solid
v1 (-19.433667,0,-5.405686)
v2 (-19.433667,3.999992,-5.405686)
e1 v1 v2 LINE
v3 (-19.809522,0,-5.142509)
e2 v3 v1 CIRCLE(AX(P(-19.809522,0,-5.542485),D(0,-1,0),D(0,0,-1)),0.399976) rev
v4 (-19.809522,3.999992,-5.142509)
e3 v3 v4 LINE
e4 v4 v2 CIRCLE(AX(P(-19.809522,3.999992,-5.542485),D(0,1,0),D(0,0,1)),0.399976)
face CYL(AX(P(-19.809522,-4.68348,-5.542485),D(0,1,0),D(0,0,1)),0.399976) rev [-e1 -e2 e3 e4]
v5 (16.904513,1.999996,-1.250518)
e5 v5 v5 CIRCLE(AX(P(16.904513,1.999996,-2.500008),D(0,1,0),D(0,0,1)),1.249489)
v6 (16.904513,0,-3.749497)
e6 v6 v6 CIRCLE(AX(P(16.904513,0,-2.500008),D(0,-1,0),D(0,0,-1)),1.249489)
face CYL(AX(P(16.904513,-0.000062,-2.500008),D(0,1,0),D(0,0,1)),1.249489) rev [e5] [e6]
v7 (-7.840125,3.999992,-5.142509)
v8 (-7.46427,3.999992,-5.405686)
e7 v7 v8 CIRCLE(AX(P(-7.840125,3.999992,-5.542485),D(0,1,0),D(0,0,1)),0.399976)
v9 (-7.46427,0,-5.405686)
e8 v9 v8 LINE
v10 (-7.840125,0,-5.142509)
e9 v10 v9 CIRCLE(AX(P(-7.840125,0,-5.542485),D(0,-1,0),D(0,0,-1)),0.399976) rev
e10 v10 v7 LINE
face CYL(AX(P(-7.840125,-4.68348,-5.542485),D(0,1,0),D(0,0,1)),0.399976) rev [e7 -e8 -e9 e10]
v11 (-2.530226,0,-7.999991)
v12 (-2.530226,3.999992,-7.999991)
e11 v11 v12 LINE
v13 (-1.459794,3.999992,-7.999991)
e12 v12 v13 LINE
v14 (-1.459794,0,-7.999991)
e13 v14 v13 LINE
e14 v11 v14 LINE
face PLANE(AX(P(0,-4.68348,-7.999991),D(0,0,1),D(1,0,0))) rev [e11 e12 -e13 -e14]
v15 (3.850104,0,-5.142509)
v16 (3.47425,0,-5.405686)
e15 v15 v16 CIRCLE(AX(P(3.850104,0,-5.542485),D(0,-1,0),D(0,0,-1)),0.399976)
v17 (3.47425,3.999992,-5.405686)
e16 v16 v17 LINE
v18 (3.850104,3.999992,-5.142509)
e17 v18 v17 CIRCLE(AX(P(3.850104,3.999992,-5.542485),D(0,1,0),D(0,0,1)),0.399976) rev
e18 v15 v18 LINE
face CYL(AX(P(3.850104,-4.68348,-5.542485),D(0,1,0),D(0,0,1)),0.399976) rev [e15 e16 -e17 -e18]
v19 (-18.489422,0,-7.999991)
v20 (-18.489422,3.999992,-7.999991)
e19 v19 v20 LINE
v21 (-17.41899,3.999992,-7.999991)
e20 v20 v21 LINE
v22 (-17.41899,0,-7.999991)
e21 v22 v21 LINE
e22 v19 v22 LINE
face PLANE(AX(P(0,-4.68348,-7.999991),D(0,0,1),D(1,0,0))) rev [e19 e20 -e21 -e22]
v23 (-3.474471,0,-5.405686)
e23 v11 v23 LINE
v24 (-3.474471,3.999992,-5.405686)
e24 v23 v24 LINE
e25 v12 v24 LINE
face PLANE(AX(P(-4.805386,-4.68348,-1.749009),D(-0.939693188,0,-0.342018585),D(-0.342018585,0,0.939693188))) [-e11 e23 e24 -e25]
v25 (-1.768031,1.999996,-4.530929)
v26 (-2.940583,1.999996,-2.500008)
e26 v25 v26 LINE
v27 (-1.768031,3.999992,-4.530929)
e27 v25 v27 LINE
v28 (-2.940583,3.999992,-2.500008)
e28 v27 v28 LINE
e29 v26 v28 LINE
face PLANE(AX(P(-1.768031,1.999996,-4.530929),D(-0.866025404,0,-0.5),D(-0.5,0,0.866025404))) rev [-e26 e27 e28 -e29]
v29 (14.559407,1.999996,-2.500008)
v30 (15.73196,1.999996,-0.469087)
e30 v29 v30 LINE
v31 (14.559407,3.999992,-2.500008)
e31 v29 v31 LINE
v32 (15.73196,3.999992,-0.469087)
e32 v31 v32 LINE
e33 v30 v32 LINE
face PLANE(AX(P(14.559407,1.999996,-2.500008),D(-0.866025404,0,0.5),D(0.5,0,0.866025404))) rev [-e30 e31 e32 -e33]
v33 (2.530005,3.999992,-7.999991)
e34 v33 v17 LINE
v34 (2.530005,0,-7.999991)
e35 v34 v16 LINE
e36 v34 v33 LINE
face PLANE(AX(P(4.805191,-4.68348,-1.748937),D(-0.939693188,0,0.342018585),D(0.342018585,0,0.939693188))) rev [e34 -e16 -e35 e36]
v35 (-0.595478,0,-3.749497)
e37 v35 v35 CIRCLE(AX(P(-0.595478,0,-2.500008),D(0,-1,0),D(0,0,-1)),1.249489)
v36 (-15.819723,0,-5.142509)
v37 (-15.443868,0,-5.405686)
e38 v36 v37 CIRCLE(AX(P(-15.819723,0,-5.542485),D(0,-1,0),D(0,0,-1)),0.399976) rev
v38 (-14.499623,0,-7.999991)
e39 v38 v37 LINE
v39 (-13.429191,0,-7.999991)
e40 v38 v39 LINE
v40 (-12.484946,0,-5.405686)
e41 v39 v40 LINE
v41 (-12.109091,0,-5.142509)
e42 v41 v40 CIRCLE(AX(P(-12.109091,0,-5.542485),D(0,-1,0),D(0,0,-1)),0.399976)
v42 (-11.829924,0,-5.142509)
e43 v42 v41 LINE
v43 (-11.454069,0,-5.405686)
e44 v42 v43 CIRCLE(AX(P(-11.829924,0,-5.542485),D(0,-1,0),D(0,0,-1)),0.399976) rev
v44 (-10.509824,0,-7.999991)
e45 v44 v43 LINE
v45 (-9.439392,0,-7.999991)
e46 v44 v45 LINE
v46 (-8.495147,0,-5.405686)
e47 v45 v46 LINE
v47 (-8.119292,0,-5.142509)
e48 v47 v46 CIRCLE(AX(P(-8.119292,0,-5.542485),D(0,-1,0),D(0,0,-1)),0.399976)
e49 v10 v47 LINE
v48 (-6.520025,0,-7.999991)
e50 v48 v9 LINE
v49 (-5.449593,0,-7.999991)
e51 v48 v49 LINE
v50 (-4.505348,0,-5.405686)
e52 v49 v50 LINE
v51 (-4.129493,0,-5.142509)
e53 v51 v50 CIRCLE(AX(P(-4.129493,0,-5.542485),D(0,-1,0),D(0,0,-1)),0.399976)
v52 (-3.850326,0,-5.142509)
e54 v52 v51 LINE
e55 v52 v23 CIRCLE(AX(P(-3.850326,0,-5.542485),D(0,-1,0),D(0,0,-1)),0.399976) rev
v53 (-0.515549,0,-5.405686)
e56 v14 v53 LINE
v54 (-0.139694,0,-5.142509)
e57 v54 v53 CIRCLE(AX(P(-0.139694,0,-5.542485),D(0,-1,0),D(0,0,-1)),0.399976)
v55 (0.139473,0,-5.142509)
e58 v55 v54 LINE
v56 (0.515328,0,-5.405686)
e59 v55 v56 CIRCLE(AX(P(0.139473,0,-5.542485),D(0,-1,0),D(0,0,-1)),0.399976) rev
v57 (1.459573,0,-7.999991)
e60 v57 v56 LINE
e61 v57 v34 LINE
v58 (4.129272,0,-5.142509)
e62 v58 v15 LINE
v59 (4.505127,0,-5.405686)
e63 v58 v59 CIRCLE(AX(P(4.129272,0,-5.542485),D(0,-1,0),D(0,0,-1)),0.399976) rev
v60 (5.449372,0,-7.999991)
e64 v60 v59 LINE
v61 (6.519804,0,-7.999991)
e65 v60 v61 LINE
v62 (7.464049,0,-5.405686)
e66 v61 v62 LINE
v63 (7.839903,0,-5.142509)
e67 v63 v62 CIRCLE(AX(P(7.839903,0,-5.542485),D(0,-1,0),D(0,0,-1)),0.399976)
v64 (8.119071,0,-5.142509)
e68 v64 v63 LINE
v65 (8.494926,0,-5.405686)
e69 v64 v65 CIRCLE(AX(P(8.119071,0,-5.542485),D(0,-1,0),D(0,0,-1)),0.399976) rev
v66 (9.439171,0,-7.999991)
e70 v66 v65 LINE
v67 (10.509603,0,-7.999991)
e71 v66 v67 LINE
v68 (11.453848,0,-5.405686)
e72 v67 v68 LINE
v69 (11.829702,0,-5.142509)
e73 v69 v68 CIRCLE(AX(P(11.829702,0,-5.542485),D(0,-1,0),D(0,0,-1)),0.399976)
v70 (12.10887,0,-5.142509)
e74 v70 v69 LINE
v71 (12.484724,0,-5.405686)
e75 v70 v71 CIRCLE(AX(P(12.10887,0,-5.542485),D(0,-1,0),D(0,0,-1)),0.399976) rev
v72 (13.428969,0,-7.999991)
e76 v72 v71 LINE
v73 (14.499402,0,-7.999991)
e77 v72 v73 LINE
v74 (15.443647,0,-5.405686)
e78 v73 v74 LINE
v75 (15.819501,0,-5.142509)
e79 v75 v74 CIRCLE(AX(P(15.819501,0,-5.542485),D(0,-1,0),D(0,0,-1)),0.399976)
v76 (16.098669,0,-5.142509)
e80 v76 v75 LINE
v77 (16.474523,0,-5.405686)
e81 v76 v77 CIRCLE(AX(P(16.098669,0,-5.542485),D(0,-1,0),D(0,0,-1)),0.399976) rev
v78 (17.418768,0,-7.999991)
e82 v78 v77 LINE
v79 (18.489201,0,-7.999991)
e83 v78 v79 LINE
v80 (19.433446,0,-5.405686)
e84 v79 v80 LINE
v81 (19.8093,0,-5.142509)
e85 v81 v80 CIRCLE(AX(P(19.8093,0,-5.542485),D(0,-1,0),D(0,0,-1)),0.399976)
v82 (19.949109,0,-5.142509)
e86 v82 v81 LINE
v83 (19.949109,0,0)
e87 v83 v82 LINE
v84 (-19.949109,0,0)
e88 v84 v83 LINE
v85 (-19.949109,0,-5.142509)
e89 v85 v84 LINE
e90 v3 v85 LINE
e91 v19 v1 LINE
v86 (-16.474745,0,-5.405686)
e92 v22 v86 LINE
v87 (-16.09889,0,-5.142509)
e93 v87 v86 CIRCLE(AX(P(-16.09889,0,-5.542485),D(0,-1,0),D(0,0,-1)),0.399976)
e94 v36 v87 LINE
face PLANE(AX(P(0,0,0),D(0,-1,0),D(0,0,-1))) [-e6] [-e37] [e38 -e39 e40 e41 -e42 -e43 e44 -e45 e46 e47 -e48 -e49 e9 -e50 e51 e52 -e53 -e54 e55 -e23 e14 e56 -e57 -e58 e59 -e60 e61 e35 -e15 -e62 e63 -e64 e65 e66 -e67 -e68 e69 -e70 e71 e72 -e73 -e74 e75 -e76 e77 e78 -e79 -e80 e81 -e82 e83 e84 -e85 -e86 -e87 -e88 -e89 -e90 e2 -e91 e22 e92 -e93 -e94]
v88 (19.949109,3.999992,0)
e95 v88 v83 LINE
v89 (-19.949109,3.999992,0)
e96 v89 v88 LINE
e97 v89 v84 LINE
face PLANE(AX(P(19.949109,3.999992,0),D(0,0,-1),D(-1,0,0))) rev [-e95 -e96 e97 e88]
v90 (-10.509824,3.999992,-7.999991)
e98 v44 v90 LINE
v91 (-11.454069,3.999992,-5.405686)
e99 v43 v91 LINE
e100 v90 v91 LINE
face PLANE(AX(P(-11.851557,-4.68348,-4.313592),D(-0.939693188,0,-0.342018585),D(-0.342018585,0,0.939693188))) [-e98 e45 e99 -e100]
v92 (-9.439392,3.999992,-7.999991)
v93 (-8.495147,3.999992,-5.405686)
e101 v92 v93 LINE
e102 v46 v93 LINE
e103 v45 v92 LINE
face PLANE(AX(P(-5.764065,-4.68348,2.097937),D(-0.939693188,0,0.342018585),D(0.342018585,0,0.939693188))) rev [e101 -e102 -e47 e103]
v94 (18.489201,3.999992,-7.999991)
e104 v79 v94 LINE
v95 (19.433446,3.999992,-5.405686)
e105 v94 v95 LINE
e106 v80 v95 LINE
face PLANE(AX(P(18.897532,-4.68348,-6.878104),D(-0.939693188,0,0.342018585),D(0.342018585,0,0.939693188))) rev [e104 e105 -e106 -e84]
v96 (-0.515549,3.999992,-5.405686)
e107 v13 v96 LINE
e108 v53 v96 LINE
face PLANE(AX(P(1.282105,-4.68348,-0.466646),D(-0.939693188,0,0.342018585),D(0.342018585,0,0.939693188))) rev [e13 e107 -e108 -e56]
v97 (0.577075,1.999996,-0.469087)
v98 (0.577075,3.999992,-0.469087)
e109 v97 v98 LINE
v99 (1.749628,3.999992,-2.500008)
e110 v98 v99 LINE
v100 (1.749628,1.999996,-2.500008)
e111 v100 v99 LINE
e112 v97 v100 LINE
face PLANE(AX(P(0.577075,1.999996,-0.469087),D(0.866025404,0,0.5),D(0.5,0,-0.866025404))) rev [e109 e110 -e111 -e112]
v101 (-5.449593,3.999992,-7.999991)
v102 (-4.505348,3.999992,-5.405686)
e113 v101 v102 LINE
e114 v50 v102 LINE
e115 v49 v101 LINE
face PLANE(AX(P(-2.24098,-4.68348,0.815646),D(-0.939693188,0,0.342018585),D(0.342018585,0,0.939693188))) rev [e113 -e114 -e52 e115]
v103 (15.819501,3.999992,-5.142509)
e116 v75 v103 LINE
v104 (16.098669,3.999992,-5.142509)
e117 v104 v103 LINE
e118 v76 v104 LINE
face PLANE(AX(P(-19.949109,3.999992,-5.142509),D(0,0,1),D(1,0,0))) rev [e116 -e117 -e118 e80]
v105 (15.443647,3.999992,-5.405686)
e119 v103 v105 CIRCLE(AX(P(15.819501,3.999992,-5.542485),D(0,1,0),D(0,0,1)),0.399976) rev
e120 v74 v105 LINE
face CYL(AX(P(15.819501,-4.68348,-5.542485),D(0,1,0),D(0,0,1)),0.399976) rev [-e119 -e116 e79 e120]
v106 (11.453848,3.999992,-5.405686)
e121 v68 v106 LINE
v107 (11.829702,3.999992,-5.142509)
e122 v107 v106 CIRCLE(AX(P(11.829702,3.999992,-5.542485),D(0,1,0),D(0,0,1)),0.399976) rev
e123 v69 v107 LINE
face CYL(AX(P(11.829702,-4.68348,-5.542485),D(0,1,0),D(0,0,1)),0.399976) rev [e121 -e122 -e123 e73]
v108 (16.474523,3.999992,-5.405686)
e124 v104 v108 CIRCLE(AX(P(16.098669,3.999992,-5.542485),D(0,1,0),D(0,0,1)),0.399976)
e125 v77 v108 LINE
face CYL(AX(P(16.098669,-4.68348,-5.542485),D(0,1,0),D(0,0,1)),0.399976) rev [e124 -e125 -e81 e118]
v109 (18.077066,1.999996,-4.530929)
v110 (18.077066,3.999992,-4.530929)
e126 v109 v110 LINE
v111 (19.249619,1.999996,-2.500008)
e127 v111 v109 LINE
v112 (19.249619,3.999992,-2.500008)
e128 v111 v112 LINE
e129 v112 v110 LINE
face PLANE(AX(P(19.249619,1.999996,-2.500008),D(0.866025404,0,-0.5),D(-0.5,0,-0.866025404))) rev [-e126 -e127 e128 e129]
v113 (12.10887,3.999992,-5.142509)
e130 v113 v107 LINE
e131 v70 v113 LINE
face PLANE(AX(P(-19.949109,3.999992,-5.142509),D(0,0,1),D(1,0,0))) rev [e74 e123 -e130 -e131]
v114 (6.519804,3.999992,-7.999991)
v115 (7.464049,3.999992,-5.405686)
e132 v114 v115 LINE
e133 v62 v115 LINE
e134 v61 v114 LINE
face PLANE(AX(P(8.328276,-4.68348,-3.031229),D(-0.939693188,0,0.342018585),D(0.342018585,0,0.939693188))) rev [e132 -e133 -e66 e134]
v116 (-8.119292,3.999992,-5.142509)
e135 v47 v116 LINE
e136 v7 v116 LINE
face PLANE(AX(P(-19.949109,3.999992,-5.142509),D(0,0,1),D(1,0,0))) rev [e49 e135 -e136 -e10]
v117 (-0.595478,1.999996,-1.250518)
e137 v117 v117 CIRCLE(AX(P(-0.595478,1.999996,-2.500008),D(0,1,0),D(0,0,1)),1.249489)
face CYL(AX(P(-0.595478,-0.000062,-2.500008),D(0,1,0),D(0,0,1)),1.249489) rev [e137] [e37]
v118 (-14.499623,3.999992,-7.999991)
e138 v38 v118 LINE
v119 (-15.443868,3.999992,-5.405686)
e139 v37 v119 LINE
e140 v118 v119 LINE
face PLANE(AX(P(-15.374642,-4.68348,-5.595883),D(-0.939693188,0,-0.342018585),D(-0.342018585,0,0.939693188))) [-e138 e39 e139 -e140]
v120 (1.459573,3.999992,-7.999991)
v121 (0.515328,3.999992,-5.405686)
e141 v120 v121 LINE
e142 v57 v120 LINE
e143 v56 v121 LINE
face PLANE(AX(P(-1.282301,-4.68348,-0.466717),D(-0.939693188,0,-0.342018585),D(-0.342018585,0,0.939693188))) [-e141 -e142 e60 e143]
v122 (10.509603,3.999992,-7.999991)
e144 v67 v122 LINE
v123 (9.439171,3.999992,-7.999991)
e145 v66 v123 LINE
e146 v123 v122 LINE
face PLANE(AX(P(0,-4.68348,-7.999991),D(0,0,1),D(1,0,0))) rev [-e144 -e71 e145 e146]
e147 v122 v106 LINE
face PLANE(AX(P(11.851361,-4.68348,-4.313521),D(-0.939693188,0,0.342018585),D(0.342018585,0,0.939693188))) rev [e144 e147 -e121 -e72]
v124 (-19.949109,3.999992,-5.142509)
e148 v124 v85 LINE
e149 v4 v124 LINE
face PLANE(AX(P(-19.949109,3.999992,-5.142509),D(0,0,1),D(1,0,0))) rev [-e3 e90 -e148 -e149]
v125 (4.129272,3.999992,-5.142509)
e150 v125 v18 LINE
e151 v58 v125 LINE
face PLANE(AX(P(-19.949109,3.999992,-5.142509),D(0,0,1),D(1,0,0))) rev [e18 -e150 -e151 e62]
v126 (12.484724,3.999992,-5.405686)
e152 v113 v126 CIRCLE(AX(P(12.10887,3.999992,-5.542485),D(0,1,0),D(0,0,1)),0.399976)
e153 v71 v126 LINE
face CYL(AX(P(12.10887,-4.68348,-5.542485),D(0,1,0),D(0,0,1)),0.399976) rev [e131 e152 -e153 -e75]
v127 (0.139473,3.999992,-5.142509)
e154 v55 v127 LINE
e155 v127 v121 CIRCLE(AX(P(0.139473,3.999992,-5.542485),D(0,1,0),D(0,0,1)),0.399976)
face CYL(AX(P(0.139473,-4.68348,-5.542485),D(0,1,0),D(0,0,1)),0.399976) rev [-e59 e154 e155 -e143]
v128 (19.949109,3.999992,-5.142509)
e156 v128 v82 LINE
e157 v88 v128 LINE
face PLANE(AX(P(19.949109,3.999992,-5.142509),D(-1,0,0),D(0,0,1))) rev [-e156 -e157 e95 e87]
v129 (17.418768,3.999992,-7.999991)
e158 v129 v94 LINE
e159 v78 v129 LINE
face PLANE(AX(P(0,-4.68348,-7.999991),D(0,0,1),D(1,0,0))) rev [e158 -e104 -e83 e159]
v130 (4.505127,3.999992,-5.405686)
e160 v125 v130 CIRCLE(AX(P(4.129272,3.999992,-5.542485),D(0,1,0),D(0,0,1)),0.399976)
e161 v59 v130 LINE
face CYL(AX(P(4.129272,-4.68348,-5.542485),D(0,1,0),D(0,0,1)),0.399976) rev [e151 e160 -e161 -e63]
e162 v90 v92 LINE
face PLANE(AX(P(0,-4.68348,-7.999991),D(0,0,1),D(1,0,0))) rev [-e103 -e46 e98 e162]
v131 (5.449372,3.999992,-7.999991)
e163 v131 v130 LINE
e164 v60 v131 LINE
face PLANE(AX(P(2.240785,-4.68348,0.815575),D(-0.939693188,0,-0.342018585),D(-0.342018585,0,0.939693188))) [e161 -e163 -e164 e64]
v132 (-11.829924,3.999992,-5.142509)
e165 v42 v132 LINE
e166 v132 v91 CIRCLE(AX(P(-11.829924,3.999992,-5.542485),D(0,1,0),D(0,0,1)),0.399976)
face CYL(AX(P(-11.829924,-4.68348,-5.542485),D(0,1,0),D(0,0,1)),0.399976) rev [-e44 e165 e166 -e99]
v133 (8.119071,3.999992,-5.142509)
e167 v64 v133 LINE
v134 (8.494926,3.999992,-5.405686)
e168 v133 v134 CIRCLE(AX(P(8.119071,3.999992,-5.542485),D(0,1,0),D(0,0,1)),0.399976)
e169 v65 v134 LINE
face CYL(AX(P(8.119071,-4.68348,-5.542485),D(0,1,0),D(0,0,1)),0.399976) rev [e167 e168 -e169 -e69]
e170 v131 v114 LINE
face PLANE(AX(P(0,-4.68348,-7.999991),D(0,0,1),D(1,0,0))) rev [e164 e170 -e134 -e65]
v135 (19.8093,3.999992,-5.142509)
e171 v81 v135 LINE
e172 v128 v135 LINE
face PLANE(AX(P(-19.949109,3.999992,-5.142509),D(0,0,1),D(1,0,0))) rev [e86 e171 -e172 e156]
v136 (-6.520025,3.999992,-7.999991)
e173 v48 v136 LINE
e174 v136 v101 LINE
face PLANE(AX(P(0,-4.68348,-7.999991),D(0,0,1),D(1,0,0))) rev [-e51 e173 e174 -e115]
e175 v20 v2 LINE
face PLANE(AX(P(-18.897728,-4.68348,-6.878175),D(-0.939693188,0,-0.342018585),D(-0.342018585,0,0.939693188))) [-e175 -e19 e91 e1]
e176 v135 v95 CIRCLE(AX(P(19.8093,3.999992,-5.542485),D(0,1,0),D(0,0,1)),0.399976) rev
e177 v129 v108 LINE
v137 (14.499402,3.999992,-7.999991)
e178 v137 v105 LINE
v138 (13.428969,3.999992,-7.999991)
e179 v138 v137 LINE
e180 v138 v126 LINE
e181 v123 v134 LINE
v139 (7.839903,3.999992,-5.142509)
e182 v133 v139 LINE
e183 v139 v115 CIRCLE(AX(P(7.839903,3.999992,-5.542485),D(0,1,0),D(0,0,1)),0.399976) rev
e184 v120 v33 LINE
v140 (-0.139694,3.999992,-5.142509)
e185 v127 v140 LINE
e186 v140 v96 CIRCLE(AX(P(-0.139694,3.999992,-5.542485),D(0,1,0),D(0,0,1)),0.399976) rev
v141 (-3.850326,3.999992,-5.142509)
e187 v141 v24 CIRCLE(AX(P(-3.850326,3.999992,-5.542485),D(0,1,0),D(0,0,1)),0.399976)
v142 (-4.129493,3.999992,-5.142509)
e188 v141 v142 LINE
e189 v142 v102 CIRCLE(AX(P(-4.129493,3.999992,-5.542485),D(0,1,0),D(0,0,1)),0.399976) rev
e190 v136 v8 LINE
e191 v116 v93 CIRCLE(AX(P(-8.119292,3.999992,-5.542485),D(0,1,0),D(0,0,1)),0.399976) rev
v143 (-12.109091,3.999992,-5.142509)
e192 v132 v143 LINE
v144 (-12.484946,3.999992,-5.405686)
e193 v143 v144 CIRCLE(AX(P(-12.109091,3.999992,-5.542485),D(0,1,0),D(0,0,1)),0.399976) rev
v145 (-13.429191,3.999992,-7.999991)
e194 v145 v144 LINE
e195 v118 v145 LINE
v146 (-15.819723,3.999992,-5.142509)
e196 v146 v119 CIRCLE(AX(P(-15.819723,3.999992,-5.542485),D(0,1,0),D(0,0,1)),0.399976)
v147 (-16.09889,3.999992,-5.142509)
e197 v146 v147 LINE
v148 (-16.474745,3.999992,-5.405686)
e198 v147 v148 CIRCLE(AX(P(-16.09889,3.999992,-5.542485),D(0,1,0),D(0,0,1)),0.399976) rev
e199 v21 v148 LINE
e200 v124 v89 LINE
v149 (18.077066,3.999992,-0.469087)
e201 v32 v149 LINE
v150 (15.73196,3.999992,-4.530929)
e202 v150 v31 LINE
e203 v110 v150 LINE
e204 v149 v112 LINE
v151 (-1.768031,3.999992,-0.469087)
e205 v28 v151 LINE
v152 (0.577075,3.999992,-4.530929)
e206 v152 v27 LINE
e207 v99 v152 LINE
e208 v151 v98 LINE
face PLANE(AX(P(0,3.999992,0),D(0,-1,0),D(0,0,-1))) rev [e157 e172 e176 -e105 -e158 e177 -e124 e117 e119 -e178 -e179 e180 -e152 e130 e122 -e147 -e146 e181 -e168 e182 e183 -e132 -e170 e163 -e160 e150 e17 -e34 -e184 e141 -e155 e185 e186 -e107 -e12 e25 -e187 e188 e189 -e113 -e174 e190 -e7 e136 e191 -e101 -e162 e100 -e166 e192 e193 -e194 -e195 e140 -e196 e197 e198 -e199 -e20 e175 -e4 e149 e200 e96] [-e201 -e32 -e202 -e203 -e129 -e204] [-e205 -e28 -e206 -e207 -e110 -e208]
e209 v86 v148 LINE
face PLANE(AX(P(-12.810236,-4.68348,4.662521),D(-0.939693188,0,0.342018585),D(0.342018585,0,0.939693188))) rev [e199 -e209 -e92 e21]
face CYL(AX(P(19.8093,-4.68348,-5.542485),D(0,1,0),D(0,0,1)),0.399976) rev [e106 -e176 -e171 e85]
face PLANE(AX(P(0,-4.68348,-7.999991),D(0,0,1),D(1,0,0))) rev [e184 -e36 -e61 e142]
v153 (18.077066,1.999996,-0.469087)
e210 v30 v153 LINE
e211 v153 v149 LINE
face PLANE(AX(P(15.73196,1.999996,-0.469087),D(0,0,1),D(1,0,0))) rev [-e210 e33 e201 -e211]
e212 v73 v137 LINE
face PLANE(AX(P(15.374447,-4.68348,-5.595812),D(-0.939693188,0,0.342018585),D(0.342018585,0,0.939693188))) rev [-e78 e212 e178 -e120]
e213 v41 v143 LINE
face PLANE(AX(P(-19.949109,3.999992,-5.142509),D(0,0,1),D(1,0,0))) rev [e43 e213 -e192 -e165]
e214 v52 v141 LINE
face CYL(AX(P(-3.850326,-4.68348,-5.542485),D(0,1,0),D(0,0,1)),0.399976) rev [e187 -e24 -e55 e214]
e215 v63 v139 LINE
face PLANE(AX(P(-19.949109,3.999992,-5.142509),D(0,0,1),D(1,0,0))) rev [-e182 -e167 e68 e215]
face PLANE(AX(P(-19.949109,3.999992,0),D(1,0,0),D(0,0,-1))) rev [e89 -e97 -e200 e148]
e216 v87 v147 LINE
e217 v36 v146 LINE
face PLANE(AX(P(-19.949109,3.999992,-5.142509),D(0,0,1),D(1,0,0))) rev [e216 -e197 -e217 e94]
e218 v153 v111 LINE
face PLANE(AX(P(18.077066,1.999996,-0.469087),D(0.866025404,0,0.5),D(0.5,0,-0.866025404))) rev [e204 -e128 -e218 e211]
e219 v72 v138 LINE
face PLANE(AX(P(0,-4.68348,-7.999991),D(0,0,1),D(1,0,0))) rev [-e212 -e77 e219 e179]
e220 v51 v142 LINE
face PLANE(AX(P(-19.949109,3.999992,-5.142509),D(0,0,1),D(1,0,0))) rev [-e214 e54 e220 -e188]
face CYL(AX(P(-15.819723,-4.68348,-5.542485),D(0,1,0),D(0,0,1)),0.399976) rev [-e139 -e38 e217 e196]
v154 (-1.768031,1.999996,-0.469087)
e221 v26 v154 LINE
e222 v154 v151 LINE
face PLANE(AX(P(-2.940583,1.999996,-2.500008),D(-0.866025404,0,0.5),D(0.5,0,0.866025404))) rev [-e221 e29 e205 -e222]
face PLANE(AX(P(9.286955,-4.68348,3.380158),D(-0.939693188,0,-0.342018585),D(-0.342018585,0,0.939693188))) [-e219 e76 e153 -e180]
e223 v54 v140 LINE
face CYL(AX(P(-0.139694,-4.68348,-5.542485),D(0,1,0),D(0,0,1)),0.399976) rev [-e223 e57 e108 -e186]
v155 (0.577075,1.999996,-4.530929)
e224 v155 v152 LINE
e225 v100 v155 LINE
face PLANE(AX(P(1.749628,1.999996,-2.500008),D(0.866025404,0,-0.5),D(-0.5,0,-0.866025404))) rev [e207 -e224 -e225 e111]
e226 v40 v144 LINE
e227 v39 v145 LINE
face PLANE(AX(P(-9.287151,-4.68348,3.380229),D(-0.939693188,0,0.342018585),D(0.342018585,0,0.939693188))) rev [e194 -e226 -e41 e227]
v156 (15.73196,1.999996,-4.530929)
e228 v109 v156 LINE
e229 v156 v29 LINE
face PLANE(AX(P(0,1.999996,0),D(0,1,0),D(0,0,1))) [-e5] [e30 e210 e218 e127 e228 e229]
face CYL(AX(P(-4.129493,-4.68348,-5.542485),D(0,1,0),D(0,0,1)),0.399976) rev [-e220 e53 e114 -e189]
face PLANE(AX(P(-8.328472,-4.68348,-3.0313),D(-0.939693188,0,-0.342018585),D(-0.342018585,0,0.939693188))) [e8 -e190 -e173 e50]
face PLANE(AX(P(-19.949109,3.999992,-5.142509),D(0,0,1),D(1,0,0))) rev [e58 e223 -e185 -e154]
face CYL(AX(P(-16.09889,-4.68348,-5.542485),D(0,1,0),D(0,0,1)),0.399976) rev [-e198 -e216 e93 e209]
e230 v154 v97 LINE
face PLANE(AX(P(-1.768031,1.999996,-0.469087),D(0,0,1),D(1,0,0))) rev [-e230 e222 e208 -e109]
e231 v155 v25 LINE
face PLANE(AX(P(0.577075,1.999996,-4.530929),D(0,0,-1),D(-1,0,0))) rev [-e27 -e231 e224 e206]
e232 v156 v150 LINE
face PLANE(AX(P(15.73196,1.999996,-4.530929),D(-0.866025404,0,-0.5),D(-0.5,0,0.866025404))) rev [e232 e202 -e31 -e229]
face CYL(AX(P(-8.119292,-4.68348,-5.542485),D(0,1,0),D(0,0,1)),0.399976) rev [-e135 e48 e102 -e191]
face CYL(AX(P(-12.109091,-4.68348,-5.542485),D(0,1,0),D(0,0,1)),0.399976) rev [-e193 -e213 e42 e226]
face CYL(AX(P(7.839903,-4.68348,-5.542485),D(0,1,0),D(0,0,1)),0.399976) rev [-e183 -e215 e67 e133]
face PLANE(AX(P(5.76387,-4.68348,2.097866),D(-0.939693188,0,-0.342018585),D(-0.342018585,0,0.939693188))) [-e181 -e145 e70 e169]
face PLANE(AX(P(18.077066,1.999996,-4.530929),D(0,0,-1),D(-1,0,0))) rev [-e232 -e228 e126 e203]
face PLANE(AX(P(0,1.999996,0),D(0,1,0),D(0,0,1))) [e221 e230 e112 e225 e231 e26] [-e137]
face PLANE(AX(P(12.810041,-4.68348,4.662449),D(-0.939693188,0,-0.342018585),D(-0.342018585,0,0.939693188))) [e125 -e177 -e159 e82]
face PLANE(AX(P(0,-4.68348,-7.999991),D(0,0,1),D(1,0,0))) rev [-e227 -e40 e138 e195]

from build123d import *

# Parameters (mm, degrees)
SKETCH1_W           = 39.8982184
SKETCH1_H           = 5.1425094
BOSS_EXTRUDE1_DEPTH = 3.999992
BOSS_EXTRUDE2_START = -3.999992
BOSS_EXTRUDE2_DEPTH = 3.999992
CUT_EXTRUDE4_DEPTH  = 1.999996
SKETCH4_R           = 1.2494895
CUT_EXTRUDE5_DEPTH  = 22.586264202


# Read off the part's stored shape, not the designer's step: Boss-Extrude2
with BuildPart() as part:
    # Sketch1 → Boss-Extrude1 (new body)
    with BuildSketch(Plane(origin=(0, 0, 0), x_dir=(1, 0, 0), z_dir=(0, 1, 0))):
        with Locations((0, 2.5712547)):
            Rectangle(SKETCH1_W, SKETCH1_H)
    extrude(amount=BOSS_EXTRUDE1_DEPTH)

    # Boss-Extrude2 outline → Boss-Extrude2 (add)
    with BuildSketch(Plane(origin=(0, 3.999992, 0), x_dir=(1, 0, 0), z_dir=(0, 1, 0)).offset(BOSS_EXTRUDE2_START)):
        with BuildLine():
            Line((-19.809521572, 5.1425094), (-16.098890229, 5.1425094))
            ThreePointArc((-16.098890229, 5.1425094), (-16.328307217, 5.214844403), (-16.4747448, 5.405686069))
            Line((-16.4747448, 5.405686069), (-17.4189898, 7.999991269))
            Line((-17.4189898, 7.999991269), (-18.489422, 7.999991269))
            Line((-18.489422, 7.999991269), (-19.433667, 5.405686069))
            ThreePointArc((-19.433667, 5.405686069), (-19.580104584, 5.214844403), (-19.809521572, 5.1425094))
        make_face()
        with BuildLine():
            Line((-15.819722635, 5.1425094), (-12.109091292, 5.1425094))
            ThreePointArc((-12.109091292, 5.1425094), (-12.33850828, 5.214844403), (-12.484945863, 5.405686069))
            Line((-12.484945863, 5.405686069), (-13.429190863, 7.999991269))
            Line((-13.429190863, 7.999991269), (-14.499623063, 7.999991269))
            Line((-14.499623063, 7.999991269), (-15.443868063, 5.405686069))
            ThreePointArc((-15.443868063, 5.405686069), (-15.590305646, 5.214844403), (-15.819722635, 5.1425094))
        make_face()
        with BuildLine():
            Line((-11.829923697, 5.1425094), (-8.119292355, 5.1425094))
            ThreePointArc((-8.119292355, 5.1425094), (-8.348709343, 5.214844403), (-8.495146926, 5.405686069))
            Line((-8.495146926, 5.405686069), (-9.439391926, 7.999991269))
            Line((-9.439391926, 7.999991269), (-10.509824126, 7.999991269))
            Line((-10.509824126, 7.999991269), (-11.454069126, 5.405686069))
            ThreePointArc((-11.454069126, 5.405686069), (-11.600506709, 5.214844403), (-11.829923697, 5.1425094))
        make_face()
        with BuildLine():
            Line((-7.84012476, 5.1425094), (-4.129493418, 5.1425094))
            ThreePointArc((-4.129493418, 5.1425094), (-4.358910406, 5.214844403), (-4.505347989, 5.405686069))
            Line((-4.505347989, 5.405686069), (-5.449592989, 7.999991269))
            Line((-5.449592989, 7.999991269), (-6.520025189, 7.999991269))
            Line((-6.520025189, 7.999991269), (-7.464270189, 5.405686069))
            ThreePointArc((-7.464270189, 5.405686069), (-7.610707772, 5.214844403), (-7.84012476, 5.1425094))
        make_face()
        with BuildLine():
            Line((-3.850325823, 5.1425094), (-0.13969448, 5.1425094))
            ThreePointArc((-0.13969448, 5.1425094), (-0.369111469, 5.214844403), (-0.515549052, 5.405686069))
            Line((-0.515549052, 5.405686069), (-1.459794052, 7.999991269))
            Line((-1.459794052, 7.999991269), (-2.530226252, 7.999991269))
            Line((-2.530226252, 7.999991269), (-3.474471252, 5.405686069))
            ThreePointArc((-3.474471252, 5.405686069), (-3.620908835, 5.214844403), (-3.850325823, 5.1425094))
        make_face()
        with BuildLine():
            Line((0.139473114, 5.1425094), (3.850104457, 5.1425094))
            ThreePointArc((3.850104457, 5.1425094), (3.620687469, 5.214844403), (3.474249885, 5.405686069))
            Line((3.474249885, 5.405686069), (2.530004885, 7.999991269))
            Line((2.530004885, 7.999991269), (1.459572685, 7.999991269))
            Line((1.459572685, 7.999991269), (0.515327685, 5.405686069))
            ThreePointArc((0.515327685, 5.405686069), (0.368890102, 5.214844403), (0.139473114, 5.1425094))
        make_face()
        with BuildLine():
            Line((4.129272051, 5.1425094), (7.839903394, 5.1425094))
            ThreePointArc((7.839903394, 5.1425094), (7.610486406, 5.214844403), (7.464048822, 5.405686069))
            Line((7.464048822, 5.405686069), (6.519803822, 7.999991269))
            Line((6.519803822, 7.999991269), (5.449371622, 7.999991269))
            Line((5.449371622, 7.999991269), (4.505126622, 5.405686069))
            ThreePointArc((4.505126622, 5.405686069), (4.358689039, 5.214844403), (4.129272051, 5.1425094))
        make_face()
        with BuildLine():
            Line((8.119070988, 5.1425094), (11.829702331, 5.1425094))
            ThreePointArc((11.829702331, 5.1425094), (11.600285343, 5.214844403), (11.45384776, 5.405686069))
            Line((11.45384776, 5.405686069), (10.50960276, 7.999991269))
            Line((10.50960276, 7.999991269), (9.43917056, 7.999991269))
            Line((9.43917056, 7.999991269), (8.49492556, 5.405686069))
            ThreePointArc((8.49492556, 5.405686069), (8.348487976, 5.214844403), (8.119070988, 5.1425094))
        make_face()
        with BuildLine():
            Line((12.108869925, 5.1425094), (15.819501268, 5.1425094))
            ThreePointArc((15.819501268, 5.1425094), (15.59008428, 5.214844403), (15.443646697, 5.405686069))
            Line((15.443646697, 5.405686069), (14.499401697, 7.999991269))
            Line((14.499401697, 7.999991269), (13.428969497, 7.999991269))
            Line((13.428969497, 7.999991269), (12.484724497, 5.405686069))
            ThreePointArc((12.484724497, 5.405686069), (12.338286913, 5.214844403), (12.108869925, 5.1425094))
        make_face()
        with BuildLine():
            ThreePointArc((19.809300205, 5.1425094), (19.579883217, 5.214844403), (19.433445634, 5.405686069))
            Line((19.433445634, 5.405686069), (18.489200634, 7.999991269))
            Line((18.489200634, 7.999991269), (17.418768434, 7.999991269))
            Line((17.418768434, 7.999991269), (16.474523434, 5.405686069))
            ThreePointArc((16.474523434, 5.405686069), (16.328085851, 5.214844403), (16.098668862, 5.1425094))
            Line((16.098668862, 5.1425094), (19.809300205, 5.1425094))
        make_face()
    extrude(amount=BOSS_EXTRUDE2_DEPTH)

    # Sketch3 → Cut-Extrude4 (cut)
    with BuildSketch(Plane(origin=(0, 3.999992, 0), x_dir=(1, 0, 0), z_dir=(0, 1, 0))):
        Polygon((19.2496186, 2.5000077), (18.0770657, 4.530928897), (15.7319599, 4.530928897), (14.559407, 2.5000077), (15.7319599, 0.469086503), (18.0770657, 0.469086503), align=None)
        Polygon((1.7496282, 2.5000077), (0.5770753, 4.530928897), (-1.7680305, 4.530928897), (-2.9405834, 2.5000077), (-1.7680305, 0.469086503), (0.5770753, 0.469086503), align=None)
    extrude(amount=-CUT_EXTRUDE4_DEPTH, mode=Mode.SUBTRACT)

    # Sketch4 → Cut-Extrude5 (cut, through all)
    with BuildSketch(Plane(origin=(0, 1.999996, 0), x_dir=(1, 0, 0), z_dir=(0, 1, 0))):
        with Locations(Location((16.9045128, 2.5000077, 0), (0, 0, 270))):
            Circle(SKETCH4_R)
        with Locations(Location((-0.5954776, 2.5000077, 0), (0, 0, 270))):
            Circle(SKETCH4_R)
    extrude(amount=-CUT_EXTRUDE5_DEPTH, mode=Mode.SUBTRACT)


solid = part.part
